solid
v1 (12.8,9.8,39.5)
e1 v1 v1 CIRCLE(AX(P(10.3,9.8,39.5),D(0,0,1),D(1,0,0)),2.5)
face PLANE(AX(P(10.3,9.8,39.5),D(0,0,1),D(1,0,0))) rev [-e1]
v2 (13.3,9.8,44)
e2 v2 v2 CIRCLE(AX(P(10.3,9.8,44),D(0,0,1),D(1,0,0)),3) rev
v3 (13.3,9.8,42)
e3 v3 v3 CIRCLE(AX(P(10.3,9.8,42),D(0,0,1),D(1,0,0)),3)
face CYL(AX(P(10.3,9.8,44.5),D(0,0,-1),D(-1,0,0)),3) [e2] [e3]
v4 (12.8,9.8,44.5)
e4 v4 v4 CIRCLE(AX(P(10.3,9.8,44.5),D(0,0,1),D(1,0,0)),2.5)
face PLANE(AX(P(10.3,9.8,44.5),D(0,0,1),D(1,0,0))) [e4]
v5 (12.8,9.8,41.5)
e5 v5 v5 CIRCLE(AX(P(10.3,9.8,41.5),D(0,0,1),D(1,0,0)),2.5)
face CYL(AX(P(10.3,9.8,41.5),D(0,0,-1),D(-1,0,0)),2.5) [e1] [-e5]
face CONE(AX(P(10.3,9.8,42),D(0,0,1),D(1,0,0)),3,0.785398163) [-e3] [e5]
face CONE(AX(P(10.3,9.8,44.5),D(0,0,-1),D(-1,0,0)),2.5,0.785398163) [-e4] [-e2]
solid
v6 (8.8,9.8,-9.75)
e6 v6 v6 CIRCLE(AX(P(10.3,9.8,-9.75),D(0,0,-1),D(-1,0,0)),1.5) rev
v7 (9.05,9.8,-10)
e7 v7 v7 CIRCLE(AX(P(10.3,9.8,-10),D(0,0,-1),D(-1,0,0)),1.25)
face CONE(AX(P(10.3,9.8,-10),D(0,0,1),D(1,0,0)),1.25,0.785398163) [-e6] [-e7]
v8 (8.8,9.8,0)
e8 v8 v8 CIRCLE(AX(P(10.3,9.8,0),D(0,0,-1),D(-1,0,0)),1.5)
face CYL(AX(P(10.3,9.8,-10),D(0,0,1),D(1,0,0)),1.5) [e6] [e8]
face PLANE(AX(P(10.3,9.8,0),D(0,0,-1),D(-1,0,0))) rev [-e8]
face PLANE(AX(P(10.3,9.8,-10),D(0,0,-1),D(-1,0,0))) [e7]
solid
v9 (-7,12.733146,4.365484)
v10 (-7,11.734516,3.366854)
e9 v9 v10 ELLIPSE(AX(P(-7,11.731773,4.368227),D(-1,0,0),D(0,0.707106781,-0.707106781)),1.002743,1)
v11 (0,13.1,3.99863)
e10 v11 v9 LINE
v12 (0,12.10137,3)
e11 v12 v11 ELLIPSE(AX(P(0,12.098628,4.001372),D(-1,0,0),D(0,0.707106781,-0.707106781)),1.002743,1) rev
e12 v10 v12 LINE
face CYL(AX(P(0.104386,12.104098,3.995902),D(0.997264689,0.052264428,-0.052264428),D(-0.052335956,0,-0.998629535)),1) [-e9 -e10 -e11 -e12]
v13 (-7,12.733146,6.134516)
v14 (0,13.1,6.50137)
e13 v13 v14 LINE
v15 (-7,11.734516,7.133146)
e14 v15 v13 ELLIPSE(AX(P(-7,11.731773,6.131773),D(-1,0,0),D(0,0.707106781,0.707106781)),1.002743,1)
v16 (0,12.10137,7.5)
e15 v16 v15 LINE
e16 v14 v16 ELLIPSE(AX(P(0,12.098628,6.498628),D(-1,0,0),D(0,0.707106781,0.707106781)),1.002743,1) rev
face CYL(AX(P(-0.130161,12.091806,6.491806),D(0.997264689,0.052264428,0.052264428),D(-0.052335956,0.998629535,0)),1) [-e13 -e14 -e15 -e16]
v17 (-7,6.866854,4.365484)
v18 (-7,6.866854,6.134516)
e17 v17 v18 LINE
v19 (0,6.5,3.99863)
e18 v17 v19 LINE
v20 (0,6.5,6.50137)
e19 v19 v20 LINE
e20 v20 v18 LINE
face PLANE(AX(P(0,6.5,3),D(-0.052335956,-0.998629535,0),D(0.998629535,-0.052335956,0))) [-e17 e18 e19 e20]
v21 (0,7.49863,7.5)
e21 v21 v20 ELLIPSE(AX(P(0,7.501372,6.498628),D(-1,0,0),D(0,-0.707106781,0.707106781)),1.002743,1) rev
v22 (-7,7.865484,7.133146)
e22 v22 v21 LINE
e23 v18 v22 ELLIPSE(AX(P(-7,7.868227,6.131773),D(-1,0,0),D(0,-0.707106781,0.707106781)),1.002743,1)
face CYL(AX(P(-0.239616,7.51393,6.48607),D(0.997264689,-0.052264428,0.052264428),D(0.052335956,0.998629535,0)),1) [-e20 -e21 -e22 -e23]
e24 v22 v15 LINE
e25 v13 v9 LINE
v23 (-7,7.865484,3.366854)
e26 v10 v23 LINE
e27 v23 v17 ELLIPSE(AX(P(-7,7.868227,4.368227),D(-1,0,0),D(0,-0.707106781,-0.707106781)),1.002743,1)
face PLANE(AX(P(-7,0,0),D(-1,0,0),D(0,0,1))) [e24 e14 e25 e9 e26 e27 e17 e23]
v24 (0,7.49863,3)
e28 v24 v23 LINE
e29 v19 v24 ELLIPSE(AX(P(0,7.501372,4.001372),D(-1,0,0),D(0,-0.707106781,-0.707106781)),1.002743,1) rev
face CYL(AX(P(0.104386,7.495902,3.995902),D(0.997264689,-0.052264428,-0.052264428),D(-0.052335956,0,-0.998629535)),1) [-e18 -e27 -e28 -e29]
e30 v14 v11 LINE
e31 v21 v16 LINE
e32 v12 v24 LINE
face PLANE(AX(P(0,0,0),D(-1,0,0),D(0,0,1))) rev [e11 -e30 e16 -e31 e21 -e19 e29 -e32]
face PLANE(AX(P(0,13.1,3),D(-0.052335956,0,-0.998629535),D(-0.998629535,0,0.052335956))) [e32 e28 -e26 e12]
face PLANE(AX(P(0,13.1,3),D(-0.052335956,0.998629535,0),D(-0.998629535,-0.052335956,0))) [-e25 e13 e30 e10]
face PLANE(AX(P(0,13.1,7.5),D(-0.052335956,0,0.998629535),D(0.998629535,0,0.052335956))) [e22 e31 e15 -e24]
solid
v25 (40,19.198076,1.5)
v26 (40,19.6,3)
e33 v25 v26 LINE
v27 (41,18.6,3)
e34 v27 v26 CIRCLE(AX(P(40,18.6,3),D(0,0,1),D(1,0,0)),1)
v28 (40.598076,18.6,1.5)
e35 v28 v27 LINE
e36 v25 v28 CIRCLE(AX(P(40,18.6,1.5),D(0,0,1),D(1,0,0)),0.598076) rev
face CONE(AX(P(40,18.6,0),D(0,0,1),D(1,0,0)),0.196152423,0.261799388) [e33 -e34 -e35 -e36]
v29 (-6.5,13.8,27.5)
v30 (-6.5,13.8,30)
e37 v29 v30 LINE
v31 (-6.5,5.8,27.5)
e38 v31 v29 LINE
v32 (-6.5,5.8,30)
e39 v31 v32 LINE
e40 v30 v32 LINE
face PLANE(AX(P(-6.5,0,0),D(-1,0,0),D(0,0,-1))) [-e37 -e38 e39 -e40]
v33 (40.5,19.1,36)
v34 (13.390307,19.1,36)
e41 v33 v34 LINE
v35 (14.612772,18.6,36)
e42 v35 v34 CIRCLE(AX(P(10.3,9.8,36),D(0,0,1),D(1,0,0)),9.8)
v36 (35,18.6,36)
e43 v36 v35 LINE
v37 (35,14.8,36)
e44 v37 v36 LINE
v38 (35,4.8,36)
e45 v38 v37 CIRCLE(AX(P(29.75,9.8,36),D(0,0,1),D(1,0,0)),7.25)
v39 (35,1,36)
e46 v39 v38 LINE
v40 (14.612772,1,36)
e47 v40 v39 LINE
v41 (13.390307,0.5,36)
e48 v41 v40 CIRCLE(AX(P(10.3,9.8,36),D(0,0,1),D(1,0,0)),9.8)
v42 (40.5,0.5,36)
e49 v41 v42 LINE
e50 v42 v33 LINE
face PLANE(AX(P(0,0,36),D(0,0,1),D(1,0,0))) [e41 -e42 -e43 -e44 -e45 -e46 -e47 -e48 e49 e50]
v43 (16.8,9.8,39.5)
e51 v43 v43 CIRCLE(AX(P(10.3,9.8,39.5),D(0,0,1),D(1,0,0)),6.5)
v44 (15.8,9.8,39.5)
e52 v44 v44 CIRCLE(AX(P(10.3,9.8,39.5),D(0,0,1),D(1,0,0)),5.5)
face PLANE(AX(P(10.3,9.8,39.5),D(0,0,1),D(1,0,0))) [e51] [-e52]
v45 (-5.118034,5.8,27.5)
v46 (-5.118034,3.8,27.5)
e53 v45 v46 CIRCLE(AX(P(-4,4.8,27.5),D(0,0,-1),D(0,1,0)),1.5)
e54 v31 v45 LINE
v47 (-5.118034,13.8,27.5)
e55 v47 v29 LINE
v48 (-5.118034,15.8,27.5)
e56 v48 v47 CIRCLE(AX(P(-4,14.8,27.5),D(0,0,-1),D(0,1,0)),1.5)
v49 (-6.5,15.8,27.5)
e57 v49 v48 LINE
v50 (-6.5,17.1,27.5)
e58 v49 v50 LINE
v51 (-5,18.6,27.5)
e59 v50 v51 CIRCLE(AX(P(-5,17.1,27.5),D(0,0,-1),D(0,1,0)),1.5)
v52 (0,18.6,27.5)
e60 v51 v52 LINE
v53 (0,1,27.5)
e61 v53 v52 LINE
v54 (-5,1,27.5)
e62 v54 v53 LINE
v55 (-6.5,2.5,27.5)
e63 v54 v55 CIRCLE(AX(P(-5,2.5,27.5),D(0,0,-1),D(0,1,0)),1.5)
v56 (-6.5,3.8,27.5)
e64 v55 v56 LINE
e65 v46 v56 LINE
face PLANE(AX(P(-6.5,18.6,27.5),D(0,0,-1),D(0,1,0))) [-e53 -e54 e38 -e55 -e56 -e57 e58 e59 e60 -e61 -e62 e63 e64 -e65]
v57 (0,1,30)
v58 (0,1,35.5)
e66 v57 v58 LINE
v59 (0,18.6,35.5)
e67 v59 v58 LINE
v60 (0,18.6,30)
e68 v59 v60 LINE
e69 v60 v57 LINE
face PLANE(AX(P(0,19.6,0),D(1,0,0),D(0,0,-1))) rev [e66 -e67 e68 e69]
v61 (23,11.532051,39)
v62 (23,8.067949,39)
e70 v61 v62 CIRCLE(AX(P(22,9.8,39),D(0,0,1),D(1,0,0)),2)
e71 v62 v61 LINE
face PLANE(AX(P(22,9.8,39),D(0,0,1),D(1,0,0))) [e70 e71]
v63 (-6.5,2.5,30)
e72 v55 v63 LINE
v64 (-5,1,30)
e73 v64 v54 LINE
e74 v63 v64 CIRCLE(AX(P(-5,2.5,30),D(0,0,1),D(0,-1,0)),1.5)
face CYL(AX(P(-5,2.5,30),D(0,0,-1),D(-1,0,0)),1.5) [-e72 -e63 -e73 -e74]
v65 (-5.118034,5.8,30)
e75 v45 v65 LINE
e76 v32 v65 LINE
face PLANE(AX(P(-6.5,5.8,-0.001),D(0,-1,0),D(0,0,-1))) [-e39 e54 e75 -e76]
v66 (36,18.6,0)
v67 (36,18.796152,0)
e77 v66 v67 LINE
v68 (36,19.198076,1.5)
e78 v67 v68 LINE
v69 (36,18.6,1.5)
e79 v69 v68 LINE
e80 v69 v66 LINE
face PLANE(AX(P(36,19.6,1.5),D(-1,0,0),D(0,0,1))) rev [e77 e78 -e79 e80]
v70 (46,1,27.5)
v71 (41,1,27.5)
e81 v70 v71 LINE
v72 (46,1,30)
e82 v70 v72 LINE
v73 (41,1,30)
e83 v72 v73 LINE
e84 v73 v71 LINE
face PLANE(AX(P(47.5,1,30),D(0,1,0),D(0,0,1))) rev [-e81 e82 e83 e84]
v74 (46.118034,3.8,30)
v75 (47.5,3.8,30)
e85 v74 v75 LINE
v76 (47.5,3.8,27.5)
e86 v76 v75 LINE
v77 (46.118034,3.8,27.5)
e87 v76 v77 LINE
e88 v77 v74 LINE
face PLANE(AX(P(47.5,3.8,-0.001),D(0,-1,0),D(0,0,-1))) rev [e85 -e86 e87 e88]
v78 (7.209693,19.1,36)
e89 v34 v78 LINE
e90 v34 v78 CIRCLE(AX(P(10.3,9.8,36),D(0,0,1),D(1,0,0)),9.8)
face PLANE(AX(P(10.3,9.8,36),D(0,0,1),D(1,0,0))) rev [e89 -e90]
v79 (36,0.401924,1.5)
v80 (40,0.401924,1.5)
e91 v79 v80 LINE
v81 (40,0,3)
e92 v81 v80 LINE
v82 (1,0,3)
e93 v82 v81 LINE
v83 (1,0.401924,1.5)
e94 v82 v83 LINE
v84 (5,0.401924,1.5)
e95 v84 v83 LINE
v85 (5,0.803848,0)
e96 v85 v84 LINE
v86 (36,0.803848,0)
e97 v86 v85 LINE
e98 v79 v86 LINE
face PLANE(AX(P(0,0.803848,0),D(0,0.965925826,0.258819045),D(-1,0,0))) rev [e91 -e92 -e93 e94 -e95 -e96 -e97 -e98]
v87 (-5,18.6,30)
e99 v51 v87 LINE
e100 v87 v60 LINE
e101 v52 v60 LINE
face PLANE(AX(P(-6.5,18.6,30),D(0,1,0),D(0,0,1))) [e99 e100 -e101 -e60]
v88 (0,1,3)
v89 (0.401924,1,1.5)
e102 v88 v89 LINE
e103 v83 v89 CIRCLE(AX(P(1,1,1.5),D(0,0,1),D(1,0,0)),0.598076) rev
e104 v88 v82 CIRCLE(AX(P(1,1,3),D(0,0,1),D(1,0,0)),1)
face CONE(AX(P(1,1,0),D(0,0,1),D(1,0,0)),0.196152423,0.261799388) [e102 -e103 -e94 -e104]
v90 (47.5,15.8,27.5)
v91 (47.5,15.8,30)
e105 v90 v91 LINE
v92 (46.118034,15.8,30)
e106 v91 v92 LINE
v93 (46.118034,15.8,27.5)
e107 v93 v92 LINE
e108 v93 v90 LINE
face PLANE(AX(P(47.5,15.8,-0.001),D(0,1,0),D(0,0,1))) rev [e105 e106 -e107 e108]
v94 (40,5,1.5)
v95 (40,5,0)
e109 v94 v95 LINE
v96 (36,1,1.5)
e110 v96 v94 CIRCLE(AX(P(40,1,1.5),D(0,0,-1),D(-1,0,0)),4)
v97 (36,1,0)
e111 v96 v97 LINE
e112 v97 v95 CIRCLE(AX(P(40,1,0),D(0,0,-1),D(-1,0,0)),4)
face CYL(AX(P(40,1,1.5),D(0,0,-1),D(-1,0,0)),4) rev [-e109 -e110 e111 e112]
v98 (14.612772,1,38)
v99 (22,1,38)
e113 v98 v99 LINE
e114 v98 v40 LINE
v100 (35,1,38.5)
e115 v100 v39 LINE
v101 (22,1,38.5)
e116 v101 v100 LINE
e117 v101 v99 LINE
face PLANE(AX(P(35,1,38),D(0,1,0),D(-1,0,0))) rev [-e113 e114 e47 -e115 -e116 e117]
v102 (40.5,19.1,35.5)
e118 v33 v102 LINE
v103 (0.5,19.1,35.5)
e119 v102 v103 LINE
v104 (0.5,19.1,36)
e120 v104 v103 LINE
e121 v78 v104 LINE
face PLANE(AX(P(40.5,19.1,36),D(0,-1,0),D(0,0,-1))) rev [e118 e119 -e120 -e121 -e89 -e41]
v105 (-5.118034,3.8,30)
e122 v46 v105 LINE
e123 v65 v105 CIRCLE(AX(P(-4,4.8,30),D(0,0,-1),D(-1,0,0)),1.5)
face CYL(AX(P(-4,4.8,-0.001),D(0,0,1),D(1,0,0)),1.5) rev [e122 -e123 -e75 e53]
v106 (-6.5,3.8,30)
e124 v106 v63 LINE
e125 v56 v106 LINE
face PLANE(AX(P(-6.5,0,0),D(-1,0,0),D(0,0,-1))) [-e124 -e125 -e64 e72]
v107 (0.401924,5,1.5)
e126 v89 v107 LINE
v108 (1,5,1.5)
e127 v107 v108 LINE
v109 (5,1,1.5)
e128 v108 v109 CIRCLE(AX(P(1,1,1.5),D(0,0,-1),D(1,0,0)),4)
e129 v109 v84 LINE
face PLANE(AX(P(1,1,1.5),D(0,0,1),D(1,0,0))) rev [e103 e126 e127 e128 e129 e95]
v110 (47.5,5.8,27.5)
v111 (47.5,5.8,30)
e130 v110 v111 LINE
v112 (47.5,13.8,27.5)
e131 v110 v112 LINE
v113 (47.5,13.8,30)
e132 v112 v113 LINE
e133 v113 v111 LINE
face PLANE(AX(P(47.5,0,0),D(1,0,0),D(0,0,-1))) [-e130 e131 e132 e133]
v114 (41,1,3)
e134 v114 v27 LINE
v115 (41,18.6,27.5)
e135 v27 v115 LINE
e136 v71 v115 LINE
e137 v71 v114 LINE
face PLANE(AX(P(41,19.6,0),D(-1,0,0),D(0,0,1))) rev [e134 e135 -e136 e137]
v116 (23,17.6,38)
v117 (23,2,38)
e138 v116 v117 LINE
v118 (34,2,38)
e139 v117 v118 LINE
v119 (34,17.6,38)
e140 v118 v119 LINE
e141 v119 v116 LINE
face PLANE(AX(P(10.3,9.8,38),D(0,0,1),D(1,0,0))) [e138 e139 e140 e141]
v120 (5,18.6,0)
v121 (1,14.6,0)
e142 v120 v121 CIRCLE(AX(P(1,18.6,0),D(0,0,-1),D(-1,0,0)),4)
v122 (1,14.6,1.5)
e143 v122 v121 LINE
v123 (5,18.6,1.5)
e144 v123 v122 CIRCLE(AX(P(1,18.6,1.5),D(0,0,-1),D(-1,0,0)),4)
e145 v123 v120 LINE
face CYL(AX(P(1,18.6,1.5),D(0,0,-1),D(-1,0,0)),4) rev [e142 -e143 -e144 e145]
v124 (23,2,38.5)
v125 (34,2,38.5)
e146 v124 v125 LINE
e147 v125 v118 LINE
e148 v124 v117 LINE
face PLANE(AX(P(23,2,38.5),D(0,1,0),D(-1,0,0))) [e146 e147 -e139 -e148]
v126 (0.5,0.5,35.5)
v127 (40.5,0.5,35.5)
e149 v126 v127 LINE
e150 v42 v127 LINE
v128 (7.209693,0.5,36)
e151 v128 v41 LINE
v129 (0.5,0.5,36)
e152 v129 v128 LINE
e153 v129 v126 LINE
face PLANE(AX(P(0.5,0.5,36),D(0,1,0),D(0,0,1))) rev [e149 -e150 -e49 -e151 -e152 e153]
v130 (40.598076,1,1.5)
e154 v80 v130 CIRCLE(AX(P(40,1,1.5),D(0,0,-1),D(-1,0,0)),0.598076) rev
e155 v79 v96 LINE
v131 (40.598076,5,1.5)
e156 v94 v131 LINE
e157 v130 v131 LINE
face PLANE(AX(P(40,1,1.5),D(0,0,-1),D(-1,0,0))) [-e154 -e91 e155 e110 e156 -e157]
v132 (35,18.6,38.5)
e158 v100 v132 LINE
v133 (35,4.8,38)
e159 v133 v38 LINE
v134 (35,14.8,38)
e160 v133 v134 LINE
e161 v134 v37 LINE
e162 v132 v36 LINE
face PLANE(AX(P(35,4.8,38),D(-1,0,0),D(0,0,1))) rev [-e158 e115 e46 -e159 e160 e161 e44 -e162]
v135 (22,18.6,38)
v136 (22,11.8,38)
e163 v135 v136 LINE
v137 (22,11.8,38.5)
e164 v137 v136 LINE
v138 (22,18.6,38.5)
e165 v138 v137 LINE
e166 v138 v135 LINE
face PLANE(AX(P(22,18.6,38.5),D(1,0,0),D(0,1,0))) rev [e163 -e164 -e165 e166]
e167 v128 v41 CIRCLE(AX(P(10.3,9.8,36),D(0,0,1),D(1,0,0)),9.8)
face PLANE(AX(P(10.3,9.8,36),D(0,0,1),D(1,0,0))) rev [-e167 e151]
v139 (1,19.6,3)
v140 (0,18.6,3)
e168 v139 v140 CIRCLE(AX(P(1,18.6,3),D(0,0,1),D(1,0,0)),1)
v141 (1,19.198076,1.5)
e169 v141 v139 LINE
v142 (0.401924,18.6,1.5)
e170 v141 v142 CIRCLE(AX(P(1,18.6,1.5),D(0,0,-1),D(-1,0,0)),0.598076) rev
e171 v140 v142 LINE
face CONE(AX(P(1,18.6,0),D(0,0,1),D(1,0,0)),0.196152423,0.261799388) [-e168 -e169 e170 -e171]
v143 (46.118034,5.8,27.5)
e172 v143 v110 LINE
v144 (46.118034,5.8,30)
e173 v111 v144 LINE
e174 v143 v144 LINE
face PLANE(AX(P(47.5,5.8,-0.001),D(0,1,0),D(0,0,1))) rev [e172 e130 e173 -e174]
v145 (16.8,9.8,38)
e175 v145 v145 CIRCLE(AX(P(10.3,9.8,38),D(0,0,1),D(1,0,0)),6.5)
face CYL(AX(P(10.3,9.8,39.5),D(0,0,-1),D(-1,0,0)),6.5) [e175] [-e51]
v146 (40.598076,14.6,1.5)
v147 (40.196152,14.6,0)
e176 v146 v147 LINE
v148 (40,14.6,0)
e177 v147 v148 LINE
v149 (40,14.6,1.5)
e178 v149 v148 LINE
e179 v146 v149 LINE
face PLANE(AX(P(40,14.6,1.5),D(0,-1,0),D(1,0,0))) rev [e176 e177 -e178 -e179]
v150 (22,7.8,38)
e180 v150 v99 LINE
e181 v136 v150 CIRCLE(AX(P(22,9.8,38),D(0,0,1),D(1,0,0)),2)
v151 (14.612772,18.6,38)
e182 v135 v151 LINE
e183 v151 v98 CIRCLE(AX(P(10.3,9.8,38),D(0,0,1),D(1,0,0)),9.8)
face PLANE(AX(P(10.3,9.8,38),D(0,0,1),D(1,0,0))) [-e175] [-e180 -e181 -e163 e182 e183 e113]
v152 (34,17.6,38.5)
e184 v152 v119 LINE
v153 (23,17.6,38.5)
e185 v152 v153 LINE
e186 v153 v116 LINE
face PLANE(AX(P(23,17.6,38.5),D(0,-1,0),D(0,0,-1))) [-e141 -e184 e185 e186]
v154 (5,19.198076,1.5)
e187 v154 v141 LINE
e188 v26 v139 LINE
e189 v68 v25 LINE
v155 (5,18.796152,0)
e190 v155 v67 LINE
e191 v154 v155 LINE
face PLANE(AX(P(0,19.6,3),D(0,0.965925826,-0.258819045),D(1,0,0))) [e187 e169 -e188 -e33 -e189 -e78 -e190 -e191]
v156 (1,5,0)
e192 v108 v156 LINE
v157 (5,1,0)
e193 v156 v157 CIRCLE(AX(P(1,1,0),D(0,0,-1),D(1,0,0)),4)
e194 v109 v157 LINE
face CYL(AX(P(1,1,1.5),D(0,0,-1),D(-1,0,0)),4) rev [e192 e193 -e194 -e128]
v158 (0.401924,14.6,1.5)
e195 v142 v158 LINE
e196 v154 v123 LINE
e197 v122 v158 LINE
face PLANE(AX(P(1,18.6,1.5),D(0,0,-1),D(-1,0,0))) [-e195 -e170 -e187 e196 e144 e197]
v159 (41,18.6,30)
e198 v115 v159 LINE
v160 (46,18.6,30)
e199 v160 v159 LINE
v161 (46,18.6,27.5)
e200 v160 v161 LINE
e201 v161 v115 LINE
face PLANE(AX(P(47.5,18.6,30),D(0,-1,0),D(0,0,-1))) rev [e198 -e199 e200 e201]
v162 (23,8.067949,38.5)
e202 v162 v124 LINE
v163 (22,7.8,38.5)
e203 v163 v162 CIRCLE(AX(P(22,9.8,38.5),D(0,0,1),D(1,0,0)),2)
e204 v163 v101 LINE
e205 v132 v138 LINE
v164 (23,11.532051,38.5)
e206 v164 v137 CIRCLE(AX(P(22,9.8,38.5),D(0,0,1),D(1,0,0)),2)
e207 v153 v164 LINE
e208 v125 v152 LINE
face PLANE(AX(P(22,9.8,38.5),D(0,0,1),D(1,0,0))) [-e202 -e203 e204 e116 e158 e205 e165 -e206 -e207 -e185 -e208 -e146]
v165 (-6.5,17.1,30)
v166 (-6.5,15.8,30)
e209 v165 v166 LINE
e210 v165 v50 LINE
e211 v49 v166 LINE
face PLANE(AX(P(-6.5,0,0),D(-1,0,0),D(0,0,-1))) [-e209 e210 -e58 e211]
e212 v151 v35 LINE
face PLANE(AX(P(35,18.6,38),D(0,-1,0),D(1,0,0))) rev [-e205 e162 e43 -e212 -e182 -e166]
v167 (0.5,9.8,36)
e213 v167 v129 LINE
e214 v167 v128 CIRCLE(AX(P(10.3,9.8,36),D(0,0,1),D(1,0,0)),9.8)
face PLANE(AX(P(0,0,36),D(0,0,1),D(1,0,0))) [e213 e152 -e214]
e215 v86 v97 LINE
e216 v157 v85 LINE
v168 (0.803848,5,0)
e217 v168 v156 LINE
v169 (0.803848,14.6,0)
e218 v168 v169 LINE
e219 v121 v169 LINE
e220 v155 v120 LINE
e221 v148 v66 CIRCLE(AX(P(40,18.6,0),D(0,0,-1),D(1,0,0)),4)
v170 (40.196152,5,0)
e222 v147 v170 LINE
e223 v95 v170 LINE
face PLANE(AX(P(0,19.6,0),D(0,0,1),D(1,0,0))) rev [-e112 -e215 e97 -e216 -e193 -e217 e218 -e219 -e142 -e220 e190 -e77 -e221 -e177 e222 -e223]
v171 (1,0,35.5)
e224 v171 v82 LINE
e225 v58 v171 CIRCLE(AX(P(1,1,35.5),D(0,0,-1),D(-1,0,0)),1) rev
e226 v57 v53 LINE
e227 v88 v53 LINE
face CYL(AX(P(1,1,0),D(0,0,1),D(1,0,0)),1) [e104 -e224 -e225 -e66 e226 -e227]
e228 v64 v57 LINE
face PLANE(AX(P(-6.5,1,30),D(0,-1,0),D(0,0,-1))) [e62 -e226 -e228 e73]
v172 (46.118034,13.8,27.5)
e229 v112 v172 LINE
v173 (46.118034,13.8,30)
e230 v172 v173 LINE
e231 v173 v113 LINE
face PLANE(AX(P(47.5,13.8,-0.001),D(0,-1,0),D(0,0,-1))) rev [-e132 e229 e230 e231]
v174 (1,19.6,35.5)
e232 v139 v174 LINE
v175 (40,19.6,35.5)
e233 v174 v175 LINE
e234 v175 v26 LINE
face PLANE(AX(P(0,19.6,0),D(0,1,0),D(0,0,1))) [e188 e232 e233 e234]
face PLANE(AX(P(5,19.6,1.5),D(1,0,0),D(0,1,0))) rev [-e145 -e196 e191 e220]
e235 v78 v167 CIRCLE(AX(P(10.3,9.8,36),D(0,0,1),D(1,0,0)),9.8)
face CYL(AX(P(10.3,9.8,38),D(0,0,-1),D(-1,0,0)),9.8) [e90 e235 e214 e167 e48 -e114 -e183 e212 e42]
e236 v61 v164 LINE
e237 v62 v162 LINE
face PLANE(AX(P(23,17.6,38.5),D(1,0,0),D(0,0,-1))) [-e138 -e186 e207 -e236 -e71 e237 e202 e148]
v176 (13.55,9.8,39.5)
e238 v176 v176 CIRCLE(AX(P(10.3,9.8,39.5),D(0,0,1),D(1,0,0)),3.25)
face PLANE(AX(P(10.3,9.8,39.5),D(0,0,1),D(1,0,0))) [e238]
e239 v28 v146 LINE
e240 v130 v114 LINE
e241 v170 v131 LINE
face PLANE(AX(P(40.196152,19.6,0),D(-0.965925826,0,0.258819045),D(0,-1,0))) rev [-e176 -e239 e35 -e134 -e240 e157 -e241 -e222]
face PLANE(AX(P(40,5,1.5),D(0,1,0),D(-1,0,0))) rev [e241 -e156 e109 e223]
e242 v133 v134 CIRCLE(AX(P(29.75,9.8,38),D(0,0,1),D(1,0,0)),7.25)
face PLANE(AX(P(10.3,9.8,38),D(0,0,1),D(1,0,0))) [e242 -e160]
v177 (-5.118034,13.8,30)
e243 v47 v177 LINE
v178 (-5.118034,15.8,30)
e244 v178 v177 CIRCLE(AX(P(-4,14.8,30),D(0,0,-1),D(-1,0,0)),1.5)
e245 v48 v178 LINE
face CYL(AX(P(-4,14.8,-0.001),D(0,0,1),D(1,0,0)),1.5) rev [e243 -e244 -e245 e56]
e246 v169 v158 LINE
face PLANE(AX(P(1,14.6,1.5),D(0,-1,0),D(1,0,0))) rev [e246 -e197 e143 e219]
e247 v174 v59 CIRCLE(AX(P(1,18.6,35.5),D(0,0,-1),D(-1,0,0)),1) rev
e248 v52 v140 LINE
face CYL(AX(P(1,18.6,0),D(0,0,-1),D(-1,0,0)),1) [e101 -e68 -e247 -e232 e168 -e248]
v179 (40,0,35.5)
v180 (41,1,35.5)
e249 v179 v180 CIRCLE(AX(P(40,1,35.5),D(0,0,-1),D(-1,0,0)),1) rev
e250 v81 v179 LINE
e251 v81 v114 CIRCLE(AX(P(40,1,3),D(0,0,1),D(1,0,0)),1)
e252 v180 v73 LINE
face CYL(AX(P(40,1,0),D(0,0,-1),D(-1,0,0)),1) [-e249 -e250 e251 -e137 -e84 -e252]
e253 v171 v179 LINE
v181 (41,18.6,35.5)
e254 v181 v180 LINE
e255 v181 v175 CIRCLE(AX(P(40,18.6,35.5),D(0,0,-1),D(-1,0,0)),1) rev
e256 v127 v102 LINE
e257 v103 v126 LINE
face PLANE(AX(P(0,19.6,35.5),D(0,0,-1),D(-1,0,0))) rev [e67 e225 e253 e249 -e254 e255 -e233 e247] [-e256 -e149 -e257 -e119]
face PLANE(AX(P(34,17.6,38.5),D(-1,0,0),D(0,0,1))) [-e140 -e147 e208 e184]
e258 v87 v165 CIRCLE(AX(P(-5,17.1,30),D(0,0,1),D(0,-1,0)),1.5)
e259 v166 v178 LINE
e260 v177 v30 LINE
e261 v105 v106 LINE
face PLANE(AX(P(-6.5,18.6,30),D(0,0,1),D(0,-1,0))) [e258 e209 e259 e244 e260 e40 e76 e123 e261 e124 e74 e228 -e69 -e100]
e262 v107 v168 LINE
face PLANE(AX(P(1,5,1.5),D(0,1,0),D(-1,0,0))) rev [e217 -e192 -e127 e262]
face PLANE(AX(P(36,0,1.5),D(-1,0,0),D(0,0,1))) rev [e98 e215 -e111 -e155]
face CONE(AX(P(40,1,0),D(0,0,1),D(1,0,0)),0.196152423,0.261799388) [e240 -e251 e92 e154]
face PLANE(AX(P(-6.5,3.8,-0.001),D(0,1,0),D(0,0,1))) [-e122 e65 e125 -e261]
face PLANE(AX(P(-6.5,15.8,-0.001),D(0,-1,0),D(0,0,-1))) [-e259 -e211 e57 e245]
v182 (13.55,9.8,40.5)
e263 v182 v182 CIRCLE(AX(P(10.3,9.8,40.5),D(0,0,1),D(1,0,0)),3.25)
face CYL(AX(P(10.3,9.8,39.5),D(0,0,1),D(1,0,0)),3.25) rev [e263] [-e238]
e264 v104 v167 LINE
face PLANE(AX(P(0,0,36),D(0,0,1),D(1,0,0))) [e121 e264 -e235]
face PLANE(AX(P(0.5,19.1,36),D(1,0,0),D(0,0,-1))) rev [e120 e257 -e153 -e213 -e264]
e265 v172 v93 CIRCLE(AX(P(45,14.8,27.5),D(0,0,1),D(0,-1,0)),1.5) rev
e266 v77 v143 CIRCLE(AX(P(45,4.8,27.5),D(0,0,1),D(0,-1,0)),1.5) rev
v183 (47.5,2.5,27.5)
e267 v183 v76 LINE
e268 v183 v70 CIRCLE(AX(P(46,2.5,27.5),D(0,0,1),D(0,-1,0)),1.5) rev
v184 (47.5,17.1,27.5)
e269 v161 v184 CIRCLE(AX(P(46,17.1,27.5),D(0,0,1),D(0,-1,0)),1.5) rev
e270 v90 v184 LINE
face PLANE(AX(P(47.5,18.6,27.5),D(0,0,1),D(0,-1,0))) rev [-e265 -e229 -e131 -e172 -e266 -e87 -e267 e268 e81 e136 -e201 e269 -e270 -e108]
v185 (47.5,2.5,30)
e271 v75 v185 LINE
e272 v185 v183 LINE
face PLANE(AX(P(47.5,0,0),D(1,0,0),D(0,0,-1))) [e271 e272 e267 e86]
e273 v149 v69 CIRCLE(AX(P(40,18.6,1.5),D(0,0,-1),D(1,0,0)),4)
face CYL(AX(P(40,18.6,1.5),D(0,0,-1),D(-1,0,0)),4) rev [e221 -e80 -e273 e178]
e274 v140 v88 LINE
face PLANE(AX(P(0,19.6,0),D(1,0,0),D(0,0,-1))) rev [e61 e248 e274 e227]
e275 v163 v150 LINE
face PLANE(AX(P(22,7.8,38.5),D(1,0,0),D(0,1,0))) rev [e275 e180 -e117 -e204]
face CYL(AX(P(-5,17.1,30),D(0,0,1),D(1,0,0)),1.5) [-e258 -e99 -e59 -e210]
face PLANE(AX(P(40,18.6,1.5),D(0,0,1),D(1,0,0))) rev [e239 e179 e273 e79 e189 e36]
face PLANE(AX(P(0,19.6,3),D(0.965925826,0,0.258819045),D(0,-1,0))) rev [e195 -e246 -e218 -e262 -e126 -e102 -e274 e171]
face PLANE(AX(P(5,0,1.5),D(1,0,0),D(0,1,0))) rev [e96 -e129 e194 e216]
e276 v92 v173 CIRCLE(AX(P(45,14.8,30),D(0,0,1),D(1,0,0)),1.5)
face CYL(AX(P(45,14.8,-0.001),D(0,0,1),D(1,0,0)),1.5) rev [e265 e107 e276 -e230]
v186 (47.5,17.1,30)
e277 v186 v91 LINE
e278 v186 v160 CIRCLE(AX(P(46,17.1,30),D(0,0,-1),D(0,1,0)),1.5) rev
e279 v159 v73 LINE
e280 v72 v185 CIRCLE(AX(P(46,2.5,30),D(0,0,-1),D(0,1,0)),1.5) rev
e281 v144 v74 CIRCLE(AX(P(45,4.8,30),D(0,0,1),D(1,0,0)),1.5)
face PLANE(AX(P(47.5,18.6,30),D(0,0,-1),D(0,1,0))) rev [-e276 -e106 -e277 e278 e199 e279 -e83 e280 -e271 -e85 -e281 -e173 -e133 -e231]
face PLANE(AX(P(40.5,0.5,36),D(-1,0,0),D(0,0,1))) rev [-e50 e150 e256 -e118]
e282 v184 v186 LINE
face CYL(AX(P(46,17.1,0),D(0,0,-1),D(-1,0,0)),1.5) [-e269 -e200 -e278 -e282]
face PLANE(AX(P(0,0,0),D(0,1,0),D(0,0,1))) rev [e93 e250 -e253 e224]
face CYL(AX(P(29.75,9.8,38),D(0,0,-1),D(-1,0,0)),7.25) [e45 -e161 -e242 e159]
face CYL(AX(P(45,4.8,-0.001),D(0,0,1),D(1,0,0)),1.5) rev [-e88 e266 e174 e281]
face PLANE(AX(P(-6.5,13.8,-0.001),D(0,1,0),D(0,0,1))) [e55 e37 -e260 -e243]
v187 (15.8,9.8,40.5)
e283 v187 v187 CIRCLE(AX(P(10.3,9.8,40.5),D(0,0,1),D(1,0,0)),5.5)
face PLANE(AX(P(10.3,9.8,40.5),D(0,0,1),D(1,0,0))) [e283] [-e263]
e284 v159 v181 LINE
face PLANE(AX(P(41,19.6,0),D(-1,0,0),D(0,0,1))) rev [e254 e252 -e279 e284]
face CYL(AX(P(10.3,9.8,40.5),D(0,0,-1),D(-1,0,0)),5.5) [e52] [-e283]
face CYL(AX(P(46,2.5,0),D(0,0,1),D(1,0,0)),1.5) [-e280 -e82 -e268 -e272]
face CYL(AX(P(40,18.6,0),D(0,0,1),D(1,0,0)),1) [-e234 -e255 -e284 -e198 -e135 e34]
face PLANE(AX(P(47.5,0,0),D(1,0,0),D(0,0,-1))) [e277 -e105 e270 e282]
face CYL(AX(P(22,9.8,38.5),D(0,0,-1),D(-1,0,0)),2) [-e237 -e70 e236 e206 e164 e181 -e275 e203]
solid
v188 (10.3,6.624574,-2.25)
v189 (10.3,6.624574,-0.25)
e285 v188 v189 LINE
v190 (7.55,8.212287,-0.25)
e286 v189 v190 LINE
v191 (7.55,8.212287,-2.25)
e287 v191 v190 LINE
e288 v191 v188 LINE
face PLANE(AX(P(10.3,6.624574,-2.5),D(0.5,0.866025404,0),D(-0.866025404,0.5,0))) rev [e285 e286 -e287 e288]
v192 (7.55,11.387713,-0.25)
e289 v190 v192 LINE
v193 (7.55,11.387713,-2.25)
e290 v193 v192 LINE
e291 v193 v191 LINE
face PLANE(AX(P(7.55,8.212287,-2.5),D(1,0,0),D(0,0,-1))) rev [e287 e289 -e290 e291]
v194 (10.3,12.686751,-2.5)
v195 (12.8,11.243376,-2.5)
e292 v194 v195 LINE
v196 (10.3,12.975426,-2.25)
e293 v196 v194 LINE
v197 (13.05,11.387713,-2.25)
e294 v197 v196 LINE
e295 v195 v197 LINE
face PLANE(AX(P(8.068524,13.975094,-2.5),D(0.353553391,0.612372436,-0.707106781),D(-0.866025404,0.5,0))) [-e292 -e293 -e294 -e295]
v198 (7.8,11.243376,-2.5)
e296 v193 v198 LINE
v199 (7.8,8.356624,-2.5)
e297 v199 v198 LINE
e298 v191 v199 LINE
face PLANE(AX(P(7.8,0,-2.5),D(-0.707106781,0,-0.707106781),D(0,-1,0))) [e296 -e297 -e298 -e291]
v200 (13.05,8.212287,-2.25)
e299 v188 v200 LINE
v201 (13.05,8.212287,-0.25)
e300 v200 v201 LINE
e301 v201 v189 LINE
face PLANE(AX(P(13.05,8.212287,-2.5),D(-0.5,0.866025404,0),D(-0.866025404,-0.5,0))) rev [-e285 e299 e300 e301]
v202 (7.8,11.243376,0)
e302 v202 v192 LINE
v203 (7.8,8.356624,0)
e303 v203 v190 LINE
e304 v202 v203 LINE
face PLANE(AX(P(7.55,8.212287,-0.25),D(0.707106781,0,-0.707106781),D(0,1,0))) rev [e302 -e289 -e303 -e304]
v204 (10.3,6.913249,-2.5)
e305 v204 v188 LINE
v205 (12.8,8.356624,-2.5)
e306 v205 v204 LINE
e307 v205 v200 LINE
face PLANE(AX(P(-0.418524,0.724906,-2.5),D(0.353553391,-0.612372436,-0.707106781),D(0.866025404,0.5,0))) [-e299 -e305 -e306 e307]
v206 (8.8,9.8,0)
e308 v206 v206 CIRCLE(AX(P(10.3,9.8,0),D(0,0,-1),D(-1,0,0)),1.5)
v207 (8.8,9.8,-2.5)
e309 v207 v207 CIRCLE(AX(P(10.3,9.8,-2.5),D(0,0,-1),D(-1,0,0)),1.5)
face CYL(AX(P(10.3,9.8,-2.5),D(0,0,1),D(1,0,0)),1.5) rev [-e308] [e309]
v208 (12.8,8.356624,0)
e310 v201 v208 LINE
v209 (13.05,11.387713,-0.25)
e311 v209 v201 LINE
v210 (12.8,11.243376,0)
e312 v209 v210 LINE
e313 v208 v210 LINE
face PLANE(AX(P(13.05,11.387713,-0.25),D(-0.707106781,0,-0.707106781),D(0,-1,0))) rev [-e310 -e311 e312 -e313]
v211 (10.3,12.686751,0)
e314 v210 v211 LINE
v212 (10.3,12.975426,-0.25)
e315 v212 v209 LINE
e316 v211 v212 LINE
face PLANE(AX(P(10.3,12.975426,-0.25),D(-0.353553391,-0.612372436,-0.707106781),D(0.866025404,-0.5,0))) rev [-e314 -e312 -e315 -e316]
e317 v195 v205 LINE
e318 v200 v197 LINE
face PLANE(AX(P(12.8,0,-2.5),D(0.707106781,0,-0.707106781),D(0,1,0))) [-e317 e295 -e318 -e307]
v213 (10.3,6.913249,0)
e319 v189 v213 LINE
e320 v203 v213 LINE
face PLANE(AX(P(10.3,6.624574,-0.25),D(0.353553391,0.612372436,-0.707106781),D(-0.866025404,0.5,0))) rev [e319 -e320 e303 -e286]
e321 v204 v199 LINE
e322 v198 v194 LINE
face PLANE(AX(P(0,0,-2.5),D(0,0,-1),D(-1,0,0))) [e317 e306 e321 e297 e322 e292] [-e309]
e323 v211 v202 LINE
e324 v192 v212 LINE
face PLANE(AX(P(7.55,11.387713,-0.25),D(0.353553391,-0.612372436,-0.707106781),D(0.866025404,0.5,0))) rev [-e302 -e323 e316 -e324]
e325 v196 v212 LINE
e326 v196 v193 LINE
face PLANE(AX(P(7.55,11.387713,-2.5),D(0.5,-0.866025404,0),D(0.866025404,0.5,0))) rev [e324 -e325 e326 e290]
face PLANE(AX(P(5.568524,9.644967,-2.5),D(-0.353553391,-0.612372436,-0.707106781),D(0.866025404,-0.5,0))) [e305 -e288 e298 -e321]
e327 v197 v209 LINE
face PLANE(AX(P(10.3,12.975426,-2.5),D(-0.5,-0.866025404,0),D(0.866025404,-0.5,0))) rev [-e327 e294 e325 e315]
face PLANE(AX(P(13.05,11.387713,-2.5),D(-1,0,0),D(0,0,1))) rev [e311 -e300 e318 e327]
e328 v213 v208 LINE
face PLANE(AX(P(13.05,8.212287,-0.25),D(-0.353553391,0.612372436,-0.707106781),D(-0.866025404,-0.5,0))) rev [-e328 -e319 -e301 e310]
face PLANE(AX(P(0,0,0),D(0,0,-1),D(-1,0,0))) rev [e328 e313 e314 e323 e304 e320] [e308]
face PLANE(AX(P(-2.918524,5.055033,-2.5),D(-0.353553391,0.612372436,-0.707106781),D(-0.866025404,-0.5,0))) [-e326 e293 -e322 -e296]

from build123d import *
from OCP.BRepFilletAPI import BRepFilletAPI_MakeChamfer

# Parameters (mm, degrees)
SKETCH1_W            = 41
SKETCH1_H            = 35.5
BOSS_EXTRUDE1_DEPTH  = 19.6
SKETCH5_W            = 2.5
SKETCH5_H            = 17.6
BOSS_EXTRUDE3_DEPTH  = 6.5
CUT_EXTRUDE3_REACH   = 61.501
SKETCH8_W            = 40
SKETCH8_H            = 18.6
BOSS_EXTRUDE4_DEPTH  = 0.5
BOSS_EXTRUDE6_DEPTH  = 2
SKETCH11_W           = 11
SKETCH11_H           = 15.6
BOSS_EXTRUDE7_DEPTH  = 0.5
BOSS_EXTRUDE8_DEPTH  = 0.5
SKETCH13_R           = 6.5
BOSS_EXTRUDE9_DEPTH  = 1.5
SKETCH14_R           = 5.5
BOSS_EXTRUDE10_DEPTH = 1
SKETCH15_R           = 3.25
CUT_EXTRUDE4_DEPTH   = 1
SKETCH16_R           = 2.5
BOSS_EXTRUDE11_DEPTH = 2
SKETCH18_R           = 3
BOSS_EXTRUDE12_DEPTH = 3
SKETCH21_W           = 4.5
SKETCH21_H           = 6.6
BOSS_EXTRUDE13_DEPTH = 7
BOSS_EXTRUDE13_TAPER = 3
FILLET1_R            = 1
FILLET2_R            = 1.5
CHAMFER1_SIZE        = 0.5
CHAMFER2_SIZE        = 0.5
FILLET5_R            = 1
CHAMFER3_SIZE        = 3
CHAMFER3_SIZE2       = 0.803847577
CUT_EXTRUDE5_DEPTH   = 1.5
SKETCH34_R           = 1.5
BOSS_EXTRUDE15_DEPTH = 10
SKETCH35_R           = 1.5
BOSS_EXTRUDE16_DEPTH = 2.5
CHAMFER4_SIZE        = 0.25
CHAMFER5_SIZE        = 0.25


with BuildPart() as part:
    # Sketch1 → Boss-Extrude1 (new body)
    with BuildSketch(Plane(origin=(0, 0, 0), x_dir=(1, 0, 0), z_dir=(0, 1, 0))):
        with Locations((20.5, -17.75)):
            Rectangle(SKETCH1_W, SKETCH1_H)
    extrude(amount=BOSS_EXTRUDE1_DEPTH)

    # Sketch5 → Boss-Extrude3 (add)
    with BuildSketch(Plane(origin=(41, 0, 0), x_dir=(0, 0, -1), z_dir=(1, 0, 0))):
        with Locations((-28.75, 9.8)):
            Rectangle(SKETCH5_W, SKETCH5_H)
    boss_extrude3 = extrude(amount=BOSS_EXTRUDE3_DEPTH)

    # Sketch6 → Cut-Extrude3 (cut, up to next)
    with BuildSketch(Plane.XY.offset(30), mode=Mode.PRIVATE) as cut_extrude3_sk1:
        with BuildLine():
            Line((47.5, 15.8), (46.118033989, 15.8))
            ThreePointArc((46.118033989, 15.8), (43.5, 14.8), (46.118033989, 13.8))
            Line((46.118033989, 13.8), (47.5, 13.8))
            Line((47.5, 13.8), (47.5, 15.8))
        make_face()
    cut_extrude3_tool1 = extrude(cut_extrude3_sk1.sketch, amount=-CUT_EXTRUDE3_REACH, mode=Mode.PRIVATE) & part.part
    # Sketch6 → Cut-Extrude3 (cut, up to next)
    with BuildSketch(Plane.XY.offset(30), mode=Mode.PRIVATE) as cut_extrude3_sk2:
        with BuildLine():
            Line((47.5, 3.8), (47.5, 5.8))
            Line((47.5, 5.8), (46.118033989, 5.8))
            ThreePointArc((46.118033989, 5.8), (43.5, 4.8), (46.118033989, 3.8))
            Line((46.118033989, 3.8), (47.5, 3.8))
        make_face()
    cut_extrude3_tool2 = extrude(cut_extrude3_sk2.sketch, amount=-CUT_EXTRUDE3_REACH, mode=Mode.PRIVATE) & part.part
    cut_extrude3_1 = cut_extrude3_tool1.solids().sort_by_distance((45.465516, 14.8, 30))[0]
    add(cut_extrude3_1, mode=Mode.SUBTRACT)
    cut_extrude3_2 = cut_extrude3_tool2.solids().sort_by_distance((45.465516, 4.8, 30))[0]
    add(cut_extrude3_2, mode=Mode.SUBTRACT)
    cut_extrude3 = cut_extrude3_1 + cut_extrude3_2  # Cut-Extrude3 as one shape, for the pattern or mirror that repeats it

    # Sketch8 → Boss-Extrude4 (add)
    with BuildSketch(Plane.XY.offset(35.5)):
        with Locations((20.5, 9.8)):
            Rectangle(SKETCH8_W, SKETCH8_H)
    extrude(amount=BOSS_EXTRUDE4_DEPTH)

    # Sketch10 → Boss-Extrude6 (add)
    with BuildSketch(Plane.XY.offset(36)):
        with BuildLine():
            Line((35, 18.6), (14.612771731, 18.6))
            ThreePointArc((14.612771731, 18.6), (0.5, 9.8), (14.612771731, 1))
            Line((14.612771731, 1), (35, 1))
            Line((35, 1), (35, 4.8))
            ThreePointArc((35, 4.8), (37, 9.8), (35, 14.8))
            Line((35, 14.8), (35, 18.6))
        make_face()
    extrude(amount=BOSS_EXTRUDE6_DEPTH)

    # Sketch11 → Boss-Extrude7 (add)
    with BuildSketch(Plane.XY.offset(38)):
        with BuildLine():
            Line((22, 18.6), (35, 18.6))
            Line((35, 18.6), (35, 1))
            Line((35, 1), (22, 1))
            Line((22, 1), (22, 7.8))
            ThreePointArc((22, 7.8), (20, 9.8), (22, 11.8))
            Line((22, 11.8), (22, 18.6))
        make_face()
        with Locations((28.5, 9.8)):
            Rectangle(SKETCH11_W, SKETCH11_H, mode=Mode.SUBTRACT)
    extrude(amount=BOSS_EXTRUDE7_DEPTH)

    # Sketch12 → Boss-Extrude8 (add)
    with BuildSketch(Plane.XY.offset(38.5)):
        with BuildLine():
            Line((23, 11.532050808), (23, 8.067949192))
            ThreePointArc((23, 8.067949192), (20, 9.8), (23, 11.532050808))
        make_face()
    extrude(amount=BOSS_EXTRUDE8_DEPTH)

    # Sketch13 → Boss-Extrude9 (add)
    with BuildSketch(Plane.XY.offset(38)):
        with Locations((10.3, 9.8)):
            Circle(SKETCH13_R)
    extrude(amount=BOSS_EXTRUDE9_DEPTH)

    # Sketch14 → Boss-Extrude10 (add)
    with BuildSketch(Plane.XY.offset(39.5)):
        with Locations((10.3, 9.8)):
            Circle(SKETCH14_R)
    extrude(amount=BOSS_EXTRUDE10_DEPTH)

    # Sketch15 → Cut-Extrude4 (cut)
    with BuildSketch(Plane.XY.offset(40.5)):
        with Locations((10.3, 9.8)):
            Circle(SKETCH15_R)
    extrude(amount=-CUT_EXTRUDE4_DEPTH, mode=Mode.SUBTRACT)

    # Mirror1: Boss-Extrude3 across plane
    add(boss_extrude3.mirror(Plane(origin=(20.5, 0, 0), x_dir=(0, 0, 1), z_dir=(1, 0, 0))))

    # Mirror2: Cut-Extrude3 across plane
    add(cut_extrude3.mirror(Plane(origin=(20.5, 0, 0), x_dir=(0, 0, 1), z_dir=(1, 0, 0))), mode=Mode.SUBTRACT)

    # Fillet1
    fillet1_edges = [part.edges().sort_by_distance(p)[0] for p in [
        (41, 19.6, 17.75),
        (0, 19.6, 17.75),
        (41, 0, 17.75),
        (0, 0, 17.75),
    ]]
    fillet(fillet1_edges, radius=FILLET1_R - 0.0001)  # a hair under: the kernel refuses the full size

    # Fillet2
    fillet2_edges = [part.edges().sort_by_distance(p)[0] for p in [
        (-6.5, 18.6, 28.75),
        (-6.5, 1, 28.75),
        (47.5, 1, 28.75),
        (47.5, 18.6, 28.75),
    ]]
    fillet(fillet2_edges, radius=FILLET2_R)

    # Chamfer3: one chamfer whose edges measure the first distance from different faces: ONE call of the kernel's chamfer builder (chamfer() names one face for all edges)
    chamfer3_edges_1 = [part.edges().sort_by_distance(p)[0] for p in [
        (0, 9.8, 0),
    ]]
    chamfer3_side_1 = [part.faces().sort_by_distance(p)[0] for p in [
        (0, 9.8, 16.916676854),
    ]]
    chamfer3_edges_2 = [part.edges().sort_by_distance(p)[0] for p in [
        (20.5, 0, 0),
    ]]
    chamfer3_side_2 = [part.faces().sort_by_distance(p)[0] for p in [
        (20.5, 0, 17.75),
    ]]
    chamfer3_edges_3 = [part.edges().sort_by_distance(p)[0] for p in [
        (20.5, 19.6, 0),
    ]]
    chamfer3_side_3 = [part.faces().sort_by_distance(p)[0] for p in [
        (20.5, 19.6, 17.75),
    ]]
    chamfer3_edges_4 = [part.edges().sort_by_distance(p)[0] for p in [
        (41, 9.8, 0),
    ]]
    chamfer3_side_4 = [part.faces().sort_by_distance(p)[0] for p in [
        (41, 9.8, 16.916676854),
    ]]
    chamfer3_edges_5 = [part.edges().sort_by_distance(p)[0] for p in [
        (40.707136071, 0.292863929, 0),
    ]]
    chamfer3_side_5 = [part.faces().sort_by_distance(p)[0] for p in [
        (40.707136071, 0.292863929, 17.75),
    ]]
    chamfer3_edges_6 = [part.edges().sort_by_distance(p)[0] for p in [
        (40.707136071, 19.307136071, 0),
    ]]
    chamfer3_side_6 = [part.faces().sort_by_distance(p)[0] for p in [
        (40.707136071, 19.307136071, 17.75),
    ]]
    chamfer3_edges_7 = [part.edges().sort_by_distance(p)[0] for p in [
        (0.292863929, 19.307136071, 0),
    ]]
    chamfer3_side_7 = [part.faces().sort_by_distance(p)[0] for p in [
        (0.292863929, 19.307136071, 17.75),
    ]]
    chamfer3_edges_8 = [part.edges().sort_by_distance(p)[0] for p in [
        (0.292863929, 0.292863929, 0),
    ]]
    chamfer3_side_8 = [part.faces().sort_by_distance(p)[0] for p in [
        (0.292863929, 0.292863929, 17.75),
    ]]
    chamfer3 = BRepFilletAPI_MakeChamfer(part.part.solid().wrapped)
    for e in chamfer3_edges_1:
        chamfer3.Add(CHAMFER3_SIZE, CHAMFER3_SIZE2, e.wrapped, chamfer3_side_1[0].wrapped)  # the first distance lies on this face
    for e in chamfer3_edges_2:
        chamfer3.Add(CHAMFER3_SIZE, CHAMFER3_SIZE2, e.wrapped, chamfer3_side_2[0].wrapped)  # the first distance lies on this face
    for e in chamfer3_edges_3:
        chamfer3.Add(CHAMFER3_SIZE, CHAMFER3_SIZE2, e.wrapped, chamfer3_side_3[0].wrapped)  # the first distance lies on this face
    for e in chamfer3_edges_4:
        chamfer3.Add(CHAMFER3_SIZE, CHAMFER3_SIZE2, e.wrapped, chamfer3_side_4[0].wrapped)  # the first distance lies on this face
    for e in chamfer3_edges_5:
        chamfer3.Add(CHAMFER3_SIZE, CHAMFER3_SIZE2, e.wrapped, chamfer3_side_5[0].wrapped)  # the first distance lies on this face
    for e in chamfer3_edges_6:
        chamfer3.Add(CHAMFER3_SIZE, CHAMFER3_SIZE2, e.wrapped, chamfer3_side_6[0].wrapped)  # the first distance lies on this face
    for e in chamfer3_edges_7:
        chamfer3.Add(CHAMFER3_SIZE, CHAMFER3_SIZE2, e.wrapped, chamfer3_side_7[0].wrapped)  # the first distance lies on this face
    for e in chamfer3_edges_8:
        chamfer3.Add(CHAMFER3_SIZE, CHAMFER3_SIZE2, e.wrapped, chamfer3_side_8[0].wrapped)  # the first distance lies on this face
    add(Compound.cast(chamfer3.Shape()), mode=Mode.REPLACE)

    # Sketch22 → Cut-Extrude5 (cut)
    with BuildSketch(Plane(origin=(0, 0, 0), x_dir=(-1, 0, 0), z_dir=(0, 0, -1))):
        with BuildLine():
            Line((0, 19.6), (-5, 19.6))
            Line((-5, 19.6), (-5, 18.6))
            ThreePointArc((-5, 18.6), (-3.828427125, 15.771572875), (-1, 14.6))
            Line((-1, 14.6), (0, 14.6))
            Line((0, 14.6), (0, 19.6))
        make_face()
        with BuildLine():
            Line((0, 5), (0, 0))
            Line((0, 0), (-5, 0))
            Line((-5, 0), (-5, 1))
            ThreePointArc((-5, 1), (-3.828427125, 3.828427125), (-1, 5))
            Line((-1, 5), (0, 5))
        make_face()
        with BuildLine():
            Line((-41, 0), (-36, 0))
            Line((-36, 0), (-36, 1))
            ThreePointArc((-36, 1), (-37.171572875, 3.828427125), (-40, 5))
            Line((-40, 5), (-41, 5))
            Line((-41, 5), (-41, 0))
        make_face()
        with BuildLine():
            Line((-41, 14.6), (-41, 19.6))
            Line((-41, 19.6), (-36, 19.6))
            Line((-36, 19.6), (-36, 18.6))
            ThreePointArc((-36, 18.6), (-37.171572875, 15.771572875), (-40, 14.6))
            Line((-40, 14.6), (-41, 14.6))
        make_face()
    extrude(amount=-CUT_EXTRUDE5_DEPTH, mode=Mode.SUBTRACT)


with BuildPart() as body_2:
    # Sketch16 → Boss-Extrude11 (new body)
    with BuildSketch(Plane.XY.offset(39.5)):
        with Locations((10.3, 9.8)):
            Circle(SKETCH16_R)
    extrude(amount=BOSS_EXTRUDE11_DEPTH)

    # Sketch18 → Boss-Extrude12 (add)
    with BuildSketch(Plane.XY.offset(41.5)):
        with Locations((10.3, 9.8)):
            Circle(SKETCH18_R)
    extrude(amount=BOSS_EXTRUDE12_DEPTH)

    # Chamfer1
    chamfer1_edges = [body_2.edges().sort_by_distance(p)[0] for p in [
        (7.3, 9.8, 44.5),
    ]]
    chamfer(chamfer1_edges, length=CHAMFER1_SIZE)

    # Chamfer2
    chamfer2_edges = [body_2.edges().sort_by_distance(p)[0] for p in [
        (7.3, 9.8, 41.5),
    ]]
    chamfer(chamfer2_edges, length=CHAMFER2_SIZE - 0.0001)  # a hair under: the kernel refuses the full size


with BuildPart() as body_3:
    # Sketch21 → Boss-Extrude13 (new body)
    with BuildSketch(Plane.ZY):
        with Locations((5.25, 9.8)):
            Rectangle(SKETCH21_W, SKETCH21_H)
    extrude(amount=BOSS_EXTRUDE13_DEPTH, taper=BOSS_EXTRUDE13_TAPER)

    # Fillet5
    fillet5_edges = [body_3.edges().sort_by_distance(p)[0] for p in [
        (-3.5, 12.916572773, 3.183427227),
        (-3.5, 12.916572773, 7.316572773),
        (-3.5, 6.683427227, 7.316572773),
        (-3.5, 6.683427227, 3.183427227),
    ]]
    fillet(fillet5_edges, radius=FILLET5_R)


with BuildPart() as body_4:
    # Sketch34 → Boss-Extrude15 (new body)
    with BuildSketch(Plane(origin=(0, 0, 0), x_dir=(-1, 0, 0), z_dir=(0, 0, -1))):
        with Locations((-10.3, 9.8)):
            Circle(SKETCH34_R)
    extrude(amount=BOSS_EXTRUDE15_DEPTH)

    # Chamfer4
    chamfer4_edges = [body_4.edges().sort_by_distance(p)[0] for p in [
        (11.8, 9.8, -10),
    ]]
    chamfer(chamfer4_edges, length=CHAMFER4_SIZE)


with BuildPart() as body_5:
    # Sketch35 → Boss-Extrude16 (new body)
    with BuildSketch(Plane(origin=(0, 0, 0), x_dir=(-1, 0, 0), z_dir=(0, 0, -1))):
        Polygon((-7.55, 11.38771324), (-10.3, 12.975426481), (-13.05, 11.38771324), (-13.05, 8.21228676), (-10.3, 6.624573519), (-7.55, 8.21228676), align=None)
        with Locations((-10.3, 9.8)):
            Circle(SKETCH35_R, mode=Mode.SUBTRACT)
    extrude(amount=BOSS_EXTRUDE16_DEPTH)

    # Chamfer5
    chamfer5_edges = [body_5.edges().sort_by_distance(p)[0] for p in [
        (11.675, 12.18156986, -2.5),
        (13.05, 9.8, -2.5),
        (11.675, 7.41843014, -2.5),
        (8.925, 7.41843014, -2.5),
        (7.55, 9.8, -2.5),
        (8.925, 7.41843014, 0),
        (11.675, 7.41843014, 0),
        (13.05, 9.8, 0),
        (8.925, 12.18156986, -2.5),
        (11.675, 12.18156986, 0),
        (8.925, 12.18156986, 0),
        (7.55, 9.8, 0),
    ]]
    chamfer(chamfer5_edges, length=CHAMFER5_SIZE)


solid = Compound([part.part, body_2.part, body_3.part, body_4.part, body_5.part])
